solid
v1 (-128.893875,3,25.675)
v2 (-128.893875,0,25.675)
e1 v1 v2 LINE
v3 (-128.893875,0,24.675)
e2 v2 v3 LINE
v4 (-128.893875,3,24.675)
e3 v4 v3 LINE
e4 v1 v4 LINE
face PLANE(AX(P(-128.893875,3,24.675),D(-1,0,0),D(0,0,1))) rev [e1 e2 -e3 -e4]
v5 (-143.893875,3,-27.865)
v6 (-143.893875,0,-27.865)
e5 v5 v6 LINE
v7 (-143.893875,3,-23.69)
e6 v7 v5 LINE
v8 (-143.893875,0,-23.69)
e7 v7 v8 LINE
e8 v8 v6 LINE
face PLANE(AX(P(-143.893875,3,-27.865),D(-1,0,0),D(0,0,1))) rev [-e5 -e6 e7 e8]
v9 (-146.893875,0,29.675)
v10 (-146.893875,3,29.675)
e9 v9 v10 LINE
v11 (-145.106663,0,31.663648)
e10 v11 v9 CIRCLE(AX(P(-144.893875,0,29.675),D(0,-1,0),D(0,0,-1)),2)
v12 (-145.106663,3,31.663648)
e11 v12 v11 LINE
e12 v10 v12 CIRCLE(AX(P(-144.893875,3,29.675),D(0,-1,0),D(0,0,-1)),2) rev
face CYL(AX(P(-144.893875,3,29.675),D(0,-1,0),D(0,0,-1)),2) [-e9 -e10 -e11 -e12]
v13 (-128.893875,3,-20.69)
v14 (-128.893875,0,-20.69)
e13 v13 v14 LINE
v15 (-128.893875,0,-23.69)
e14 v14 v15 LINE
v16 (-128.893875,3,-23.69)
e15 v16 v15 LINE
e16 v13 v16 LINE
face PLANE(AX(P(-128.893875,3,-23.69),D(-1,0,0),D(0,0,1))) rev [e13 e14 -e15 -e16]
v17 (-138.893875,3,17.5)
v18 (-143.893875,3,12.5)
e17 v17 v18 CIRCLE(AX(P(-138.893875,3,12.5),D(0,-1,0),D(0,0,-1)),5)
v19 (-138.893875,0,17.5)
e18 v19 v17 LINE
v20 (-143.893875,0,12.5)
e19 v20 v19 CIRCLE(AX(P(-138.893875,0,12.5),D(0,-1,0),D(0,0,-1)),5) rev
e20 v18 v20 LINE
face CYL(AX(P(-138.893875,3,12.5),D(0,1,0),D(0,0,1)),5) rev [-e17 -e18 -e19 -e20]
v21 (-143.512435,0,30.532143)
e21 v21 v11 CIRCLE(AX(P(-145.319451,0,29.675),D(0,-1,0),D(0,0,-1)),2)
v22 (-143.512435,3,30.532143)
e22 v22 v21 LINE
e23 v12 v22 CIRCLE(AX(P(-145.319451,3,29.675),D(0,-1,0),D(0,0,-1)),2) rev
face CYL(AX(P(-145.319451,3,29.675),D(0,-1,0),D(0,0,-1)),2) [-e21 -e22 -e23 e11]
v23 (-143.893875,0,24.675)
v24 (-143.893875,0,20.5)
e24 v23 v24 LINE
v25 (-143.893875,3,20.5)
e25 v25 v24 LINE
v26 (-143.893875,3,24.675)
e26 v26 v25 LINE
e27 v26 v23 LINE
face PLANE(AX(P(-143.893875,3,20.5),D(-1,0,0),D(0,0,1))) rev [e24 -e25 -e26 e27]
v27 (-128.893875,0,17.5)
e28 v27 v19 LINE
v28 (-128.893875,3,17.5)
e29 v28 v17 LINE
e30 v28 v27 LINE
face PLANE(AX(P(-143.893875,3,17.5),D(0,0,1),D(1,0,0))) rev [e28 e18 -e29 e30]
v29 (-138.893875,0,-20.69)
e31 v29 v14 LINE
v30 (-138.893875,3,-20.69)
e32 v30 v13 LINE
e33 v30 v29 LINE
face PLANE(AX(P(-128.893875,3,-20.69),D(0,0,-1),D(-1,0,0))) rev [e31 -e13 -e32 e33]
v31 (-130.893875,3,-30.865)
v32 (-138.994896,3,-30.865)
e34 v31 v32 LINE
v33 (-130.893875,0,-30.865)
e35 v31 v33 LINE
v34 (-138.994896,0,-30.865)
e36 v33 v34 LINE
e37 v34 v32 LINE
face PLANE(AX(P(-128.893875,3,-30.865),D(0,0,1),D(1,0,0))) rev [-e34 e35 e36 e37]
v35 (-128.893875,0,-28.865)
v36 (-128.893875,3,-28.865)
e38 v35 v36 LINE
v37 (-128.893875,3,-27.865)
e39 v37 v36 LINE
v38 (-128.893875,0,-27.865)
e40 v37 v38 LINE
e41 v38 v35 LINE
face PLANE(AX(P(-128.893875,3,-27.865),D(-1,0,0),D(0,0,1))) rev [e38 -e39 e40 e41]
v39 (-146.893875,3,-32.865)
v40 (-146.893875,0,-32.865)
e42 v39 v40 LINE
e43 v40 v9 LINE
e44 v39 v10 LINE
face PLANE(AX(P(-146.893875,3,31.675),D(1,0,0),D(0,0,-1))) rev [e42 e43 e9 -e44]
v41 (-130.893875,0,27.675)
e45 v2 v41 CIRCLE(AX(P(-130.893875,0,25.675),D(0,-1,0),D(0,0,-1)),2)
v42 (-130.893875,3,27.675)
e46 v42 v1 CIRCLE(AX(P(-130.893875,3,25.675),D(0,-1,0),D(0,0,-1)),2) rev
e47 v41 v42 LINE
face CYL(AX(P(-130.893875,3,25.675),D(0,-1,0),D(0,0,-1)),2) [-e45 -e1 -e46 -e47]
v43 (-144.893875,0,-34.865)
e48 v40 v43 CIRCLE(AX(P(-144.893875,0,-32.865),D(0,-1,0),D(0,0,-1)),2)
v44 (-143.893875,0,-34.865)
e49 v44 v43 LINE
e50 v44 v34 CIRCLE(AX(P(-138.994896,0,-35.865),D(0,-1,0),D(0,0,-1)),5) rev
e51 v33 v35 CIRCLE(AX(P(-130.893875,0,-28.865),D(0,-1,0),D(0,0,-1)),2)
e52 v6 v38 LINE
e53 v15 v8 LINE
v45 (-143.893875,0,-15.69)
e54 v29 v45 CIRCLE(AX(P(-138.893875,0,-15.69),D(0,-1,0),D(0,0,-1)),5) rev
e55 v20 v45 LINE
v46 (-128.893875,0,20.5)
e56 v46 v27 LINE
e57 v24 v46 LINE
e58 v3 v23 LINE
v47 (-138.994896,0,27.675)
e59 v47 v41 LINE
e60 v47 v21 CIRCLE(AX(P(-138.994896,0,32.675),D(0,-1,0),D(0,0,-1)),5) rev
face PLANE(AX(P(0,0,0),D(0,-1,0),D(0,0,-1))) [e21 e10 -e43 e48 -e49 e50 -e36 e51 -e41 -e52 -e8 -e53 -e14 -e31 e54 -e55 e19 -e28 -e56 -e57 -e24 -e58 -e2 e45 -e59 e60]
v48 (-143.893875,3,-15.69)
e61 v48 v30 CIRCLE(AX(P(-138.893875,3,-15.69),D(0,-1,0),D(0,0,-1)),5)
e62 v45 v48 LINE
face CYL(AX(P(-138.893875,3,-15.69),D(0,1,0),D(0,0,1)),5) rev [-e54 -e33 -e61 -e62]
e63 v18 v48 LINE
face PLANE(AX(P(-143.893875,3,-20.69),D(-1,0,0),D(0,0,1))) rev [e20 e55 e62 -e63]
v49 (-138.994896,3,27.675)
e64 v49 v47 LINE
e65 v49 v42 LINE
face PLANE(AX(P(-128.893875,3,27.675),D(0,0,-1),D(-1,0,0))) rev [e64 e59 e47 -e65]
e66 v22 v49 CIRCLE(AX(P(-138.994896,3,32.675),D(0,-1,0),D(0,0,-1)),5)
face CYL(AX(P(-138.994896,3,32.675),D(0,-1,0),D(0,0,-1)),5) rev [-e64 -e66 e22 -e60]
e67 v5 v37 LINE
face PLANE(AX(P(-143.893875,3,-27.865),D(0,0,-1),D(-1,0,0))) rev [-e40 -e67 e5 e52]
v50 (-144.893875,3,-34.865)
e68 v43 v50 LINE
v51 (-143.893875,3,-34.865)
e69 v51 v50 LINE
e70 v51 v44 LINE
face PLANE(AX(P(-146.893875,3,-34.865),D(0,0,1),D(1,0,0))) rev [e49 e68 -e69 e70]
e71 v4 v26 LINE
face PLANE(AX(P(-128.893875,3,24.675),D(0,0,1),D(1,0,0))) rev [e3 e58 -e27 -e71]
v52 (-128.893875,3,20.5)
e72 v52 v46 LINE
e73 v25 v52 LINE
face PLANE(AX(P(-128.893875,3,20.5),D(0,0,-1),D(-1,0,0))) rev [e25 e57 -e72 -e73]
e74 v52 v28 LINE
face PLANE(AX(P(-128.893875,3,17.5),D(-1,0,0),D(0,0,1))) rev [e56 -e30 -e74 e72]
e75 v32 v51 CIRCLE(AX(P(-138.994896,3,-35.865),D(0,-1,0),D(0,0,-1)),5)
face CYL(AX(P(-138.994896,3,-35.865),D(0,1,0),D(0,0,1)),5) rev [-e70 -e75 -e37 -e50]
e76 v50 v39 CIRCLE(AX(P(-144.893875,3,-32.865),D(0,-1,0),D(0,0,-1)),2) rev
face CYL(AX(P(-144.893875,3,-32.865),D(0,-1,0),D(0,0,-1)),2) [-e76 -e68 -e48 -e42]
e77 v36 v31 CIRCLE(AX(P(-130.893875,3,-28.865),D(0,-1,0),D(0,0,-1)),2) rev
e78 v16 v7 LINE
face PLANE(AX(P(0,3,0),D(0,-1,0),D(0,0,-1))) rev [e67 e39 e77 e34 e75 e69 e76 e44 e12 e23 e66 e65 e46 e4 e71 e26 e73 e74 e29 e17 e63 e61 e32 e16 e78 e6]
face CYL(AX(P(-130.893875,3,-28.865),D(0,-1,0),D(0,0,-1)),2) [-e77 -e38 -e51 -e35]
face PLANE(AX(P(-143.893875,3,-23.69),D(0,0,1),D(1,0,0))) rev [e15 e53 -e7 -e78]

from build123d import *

# Parameters (mm, degrees)
BOSS_EXTRUDE1_DEPTH = 3
FILLET1_R           = 5
FILLET2_R           = 2


with BuildPart() as part:
    # Sketch2 → Boss-Extrude1 (new body)
    with BuildSketch(Plane(origin=(0, 0, 0), x_dir=(1, 0, 0), z_dir=(0, 1, 0))):
        Polygon((-128.893875, -24.675), (-143.893875, -24.675), (-143.893875, -20.5), (-128.893875, -20.5), (-128.893875, -17.5), (-143.893875, -17.5), (-143.893875, 20.69), (-128.893875, 20.69), (-128.893875, 23.69), (-143.893875, 23.69), (-143.893875, 27.865), (-128.893875, 27.865), (-128.893875, 30.865), (-143.893875, 30.865), (-143.893875, 34.865), (-146.893875, 34.865), (-146.893875, -31.675), (-143.893875, -31.675), (-143.893875, -27.675), (-128.893875, -27.675), align=None)
    extrude(amount=BOSS_EXTRUDE1_DEPTH)

    # Fillet1
    # the kernel refuses this fillet: 5 mm, written as the material it adds along each edge
    with BuildSketch(Plane(origin=(-143.893875, 0, 27.675), x_dir=(1.4566126083077746e-12, 0, 1.0), z_dir=(0, 1, 0))) as fillet1_piece_1:
        with BuildLine():
            CenterArc((5, 4.898979486), FILLET1_R, 180, 78.463040967)
            Line((0, 4.898979486), (-0.1, 4.898979486))
            Line((-0.1, 4.898979486), (-0.1, 0))
            Line((-0.1, 0), (0, -0.1))
            ThreePointArc((0, -0.1), (2, -0.1), (3.98, -0.09797959))
            Line((3.98, -0.09797959), (4, 0))
        make_face()
    extrude(amount=3)
    with BuildSketch(Plane(origin=(-143.893875, 0, -30.865), x_dir=(1, 0, 0), z_dir=(0, 1, 0))) as fillet1_piece_2:
        with BuildLine():
            CenterArc((4.898979486, 5), FILLET1_R, 191.536959033, 78.463040967)
            Line((0, 4), (-0.09797959, 3.98))
            ThreePointArc((-0.09797959, 3.98), (-0.1, 2), (-0.1, 0))
            Line((-0.1, 0), (0, -0.1))
            Line((0, -0.1), (4.898979486, -0.1))
            Line((4.898979486, -0.1), (4.898979486, 0))
        make_face()
    extrude(amount=3)
    with BuildSketch(Plane(origin=(-143.893875, 0, -20.69), x_dir=(0, 0, 1), z_dir=(0, 1, 0)), Plane(origin=(-143.893875, 0, 17.5), x_dir=(1, 0, 0), z_dir=(0, 1, 0))) as fillet1_piece_3:
        with BuildLine():
            CenterArc((FILLET1_R, FILLET1_R), FILLET1_R, 180, 90)
            Line((0, FILLET1_R), (-FILLET1_R * 0.02, FILLET1_R))
            Line((-FILLET1_R * 0.02, FILLET1_R), (-FILLET1_R * 0.02, -FILLET1_R * 0.02))
            Line((-FILLET1_R * 0.02, -FILLET1_R * 0.02), (FILLET1_R, -FILLET1_R * 0.02))
            Line((FILLET1_R, -FILLET1_R * 0.02), (FILLET1_R, 0))
        make_face()
    extrude(amount=3)

    # Fillet2
    # the kernel refuses this fillet: 2 mm, written as the material it takes off along each edge
    with BuildSketch(Plane(origin=(-128.893875, -5, 27.675), x_dir=(-1, 0, 0), z_dir=(0, 1, 0)), Plane(origin=(-128.893875, -5, -30.865), x_dir=(0, 0, 1), z_dir=(0, 1, 0)), Plane(origin=(-146.893875, -5, -34.865), x_dir=(1, 0, 0), z_dir=(0, 1, 0)), Plane(origin=(-146.893875, -5, 31.675), x_dir=(0, 0, -1), z_dir=(0, 1, 0))) as fillet2_piece_1:
        with BuildLine():
            CenterArc((FILLET2_R, -FILLET2_R), FILLET2_R, 90, 90)
            Line((0, -FILLET2_R), (0, 0))
            Line((0, 0), (FILLET2_R, 0))
        make_face()
    extrude(amount=13, mode=Mode.SUBTRACT)
    with BuildSketch(Plane(origin=(-143.893875, -3.563939587, 31.675), x_dir=(-1, 0, 0), z_dir=(0, 1, 0))) as fillet2_piece_2:
        with BuildLine():
            CenterArc((1.425575835, -2), FILLET2_R, 90, 64.623066475)
            ThreePointArc((-0.381439971, -1.142857143), (-0.156170388, -0.582959844), (0, 0))
            Line((0, 0), (1.425575835, 0))
        make_face()
    extrude(amount=10.127879174, mode=Mode.SUBTRACT)


solid = part.part
